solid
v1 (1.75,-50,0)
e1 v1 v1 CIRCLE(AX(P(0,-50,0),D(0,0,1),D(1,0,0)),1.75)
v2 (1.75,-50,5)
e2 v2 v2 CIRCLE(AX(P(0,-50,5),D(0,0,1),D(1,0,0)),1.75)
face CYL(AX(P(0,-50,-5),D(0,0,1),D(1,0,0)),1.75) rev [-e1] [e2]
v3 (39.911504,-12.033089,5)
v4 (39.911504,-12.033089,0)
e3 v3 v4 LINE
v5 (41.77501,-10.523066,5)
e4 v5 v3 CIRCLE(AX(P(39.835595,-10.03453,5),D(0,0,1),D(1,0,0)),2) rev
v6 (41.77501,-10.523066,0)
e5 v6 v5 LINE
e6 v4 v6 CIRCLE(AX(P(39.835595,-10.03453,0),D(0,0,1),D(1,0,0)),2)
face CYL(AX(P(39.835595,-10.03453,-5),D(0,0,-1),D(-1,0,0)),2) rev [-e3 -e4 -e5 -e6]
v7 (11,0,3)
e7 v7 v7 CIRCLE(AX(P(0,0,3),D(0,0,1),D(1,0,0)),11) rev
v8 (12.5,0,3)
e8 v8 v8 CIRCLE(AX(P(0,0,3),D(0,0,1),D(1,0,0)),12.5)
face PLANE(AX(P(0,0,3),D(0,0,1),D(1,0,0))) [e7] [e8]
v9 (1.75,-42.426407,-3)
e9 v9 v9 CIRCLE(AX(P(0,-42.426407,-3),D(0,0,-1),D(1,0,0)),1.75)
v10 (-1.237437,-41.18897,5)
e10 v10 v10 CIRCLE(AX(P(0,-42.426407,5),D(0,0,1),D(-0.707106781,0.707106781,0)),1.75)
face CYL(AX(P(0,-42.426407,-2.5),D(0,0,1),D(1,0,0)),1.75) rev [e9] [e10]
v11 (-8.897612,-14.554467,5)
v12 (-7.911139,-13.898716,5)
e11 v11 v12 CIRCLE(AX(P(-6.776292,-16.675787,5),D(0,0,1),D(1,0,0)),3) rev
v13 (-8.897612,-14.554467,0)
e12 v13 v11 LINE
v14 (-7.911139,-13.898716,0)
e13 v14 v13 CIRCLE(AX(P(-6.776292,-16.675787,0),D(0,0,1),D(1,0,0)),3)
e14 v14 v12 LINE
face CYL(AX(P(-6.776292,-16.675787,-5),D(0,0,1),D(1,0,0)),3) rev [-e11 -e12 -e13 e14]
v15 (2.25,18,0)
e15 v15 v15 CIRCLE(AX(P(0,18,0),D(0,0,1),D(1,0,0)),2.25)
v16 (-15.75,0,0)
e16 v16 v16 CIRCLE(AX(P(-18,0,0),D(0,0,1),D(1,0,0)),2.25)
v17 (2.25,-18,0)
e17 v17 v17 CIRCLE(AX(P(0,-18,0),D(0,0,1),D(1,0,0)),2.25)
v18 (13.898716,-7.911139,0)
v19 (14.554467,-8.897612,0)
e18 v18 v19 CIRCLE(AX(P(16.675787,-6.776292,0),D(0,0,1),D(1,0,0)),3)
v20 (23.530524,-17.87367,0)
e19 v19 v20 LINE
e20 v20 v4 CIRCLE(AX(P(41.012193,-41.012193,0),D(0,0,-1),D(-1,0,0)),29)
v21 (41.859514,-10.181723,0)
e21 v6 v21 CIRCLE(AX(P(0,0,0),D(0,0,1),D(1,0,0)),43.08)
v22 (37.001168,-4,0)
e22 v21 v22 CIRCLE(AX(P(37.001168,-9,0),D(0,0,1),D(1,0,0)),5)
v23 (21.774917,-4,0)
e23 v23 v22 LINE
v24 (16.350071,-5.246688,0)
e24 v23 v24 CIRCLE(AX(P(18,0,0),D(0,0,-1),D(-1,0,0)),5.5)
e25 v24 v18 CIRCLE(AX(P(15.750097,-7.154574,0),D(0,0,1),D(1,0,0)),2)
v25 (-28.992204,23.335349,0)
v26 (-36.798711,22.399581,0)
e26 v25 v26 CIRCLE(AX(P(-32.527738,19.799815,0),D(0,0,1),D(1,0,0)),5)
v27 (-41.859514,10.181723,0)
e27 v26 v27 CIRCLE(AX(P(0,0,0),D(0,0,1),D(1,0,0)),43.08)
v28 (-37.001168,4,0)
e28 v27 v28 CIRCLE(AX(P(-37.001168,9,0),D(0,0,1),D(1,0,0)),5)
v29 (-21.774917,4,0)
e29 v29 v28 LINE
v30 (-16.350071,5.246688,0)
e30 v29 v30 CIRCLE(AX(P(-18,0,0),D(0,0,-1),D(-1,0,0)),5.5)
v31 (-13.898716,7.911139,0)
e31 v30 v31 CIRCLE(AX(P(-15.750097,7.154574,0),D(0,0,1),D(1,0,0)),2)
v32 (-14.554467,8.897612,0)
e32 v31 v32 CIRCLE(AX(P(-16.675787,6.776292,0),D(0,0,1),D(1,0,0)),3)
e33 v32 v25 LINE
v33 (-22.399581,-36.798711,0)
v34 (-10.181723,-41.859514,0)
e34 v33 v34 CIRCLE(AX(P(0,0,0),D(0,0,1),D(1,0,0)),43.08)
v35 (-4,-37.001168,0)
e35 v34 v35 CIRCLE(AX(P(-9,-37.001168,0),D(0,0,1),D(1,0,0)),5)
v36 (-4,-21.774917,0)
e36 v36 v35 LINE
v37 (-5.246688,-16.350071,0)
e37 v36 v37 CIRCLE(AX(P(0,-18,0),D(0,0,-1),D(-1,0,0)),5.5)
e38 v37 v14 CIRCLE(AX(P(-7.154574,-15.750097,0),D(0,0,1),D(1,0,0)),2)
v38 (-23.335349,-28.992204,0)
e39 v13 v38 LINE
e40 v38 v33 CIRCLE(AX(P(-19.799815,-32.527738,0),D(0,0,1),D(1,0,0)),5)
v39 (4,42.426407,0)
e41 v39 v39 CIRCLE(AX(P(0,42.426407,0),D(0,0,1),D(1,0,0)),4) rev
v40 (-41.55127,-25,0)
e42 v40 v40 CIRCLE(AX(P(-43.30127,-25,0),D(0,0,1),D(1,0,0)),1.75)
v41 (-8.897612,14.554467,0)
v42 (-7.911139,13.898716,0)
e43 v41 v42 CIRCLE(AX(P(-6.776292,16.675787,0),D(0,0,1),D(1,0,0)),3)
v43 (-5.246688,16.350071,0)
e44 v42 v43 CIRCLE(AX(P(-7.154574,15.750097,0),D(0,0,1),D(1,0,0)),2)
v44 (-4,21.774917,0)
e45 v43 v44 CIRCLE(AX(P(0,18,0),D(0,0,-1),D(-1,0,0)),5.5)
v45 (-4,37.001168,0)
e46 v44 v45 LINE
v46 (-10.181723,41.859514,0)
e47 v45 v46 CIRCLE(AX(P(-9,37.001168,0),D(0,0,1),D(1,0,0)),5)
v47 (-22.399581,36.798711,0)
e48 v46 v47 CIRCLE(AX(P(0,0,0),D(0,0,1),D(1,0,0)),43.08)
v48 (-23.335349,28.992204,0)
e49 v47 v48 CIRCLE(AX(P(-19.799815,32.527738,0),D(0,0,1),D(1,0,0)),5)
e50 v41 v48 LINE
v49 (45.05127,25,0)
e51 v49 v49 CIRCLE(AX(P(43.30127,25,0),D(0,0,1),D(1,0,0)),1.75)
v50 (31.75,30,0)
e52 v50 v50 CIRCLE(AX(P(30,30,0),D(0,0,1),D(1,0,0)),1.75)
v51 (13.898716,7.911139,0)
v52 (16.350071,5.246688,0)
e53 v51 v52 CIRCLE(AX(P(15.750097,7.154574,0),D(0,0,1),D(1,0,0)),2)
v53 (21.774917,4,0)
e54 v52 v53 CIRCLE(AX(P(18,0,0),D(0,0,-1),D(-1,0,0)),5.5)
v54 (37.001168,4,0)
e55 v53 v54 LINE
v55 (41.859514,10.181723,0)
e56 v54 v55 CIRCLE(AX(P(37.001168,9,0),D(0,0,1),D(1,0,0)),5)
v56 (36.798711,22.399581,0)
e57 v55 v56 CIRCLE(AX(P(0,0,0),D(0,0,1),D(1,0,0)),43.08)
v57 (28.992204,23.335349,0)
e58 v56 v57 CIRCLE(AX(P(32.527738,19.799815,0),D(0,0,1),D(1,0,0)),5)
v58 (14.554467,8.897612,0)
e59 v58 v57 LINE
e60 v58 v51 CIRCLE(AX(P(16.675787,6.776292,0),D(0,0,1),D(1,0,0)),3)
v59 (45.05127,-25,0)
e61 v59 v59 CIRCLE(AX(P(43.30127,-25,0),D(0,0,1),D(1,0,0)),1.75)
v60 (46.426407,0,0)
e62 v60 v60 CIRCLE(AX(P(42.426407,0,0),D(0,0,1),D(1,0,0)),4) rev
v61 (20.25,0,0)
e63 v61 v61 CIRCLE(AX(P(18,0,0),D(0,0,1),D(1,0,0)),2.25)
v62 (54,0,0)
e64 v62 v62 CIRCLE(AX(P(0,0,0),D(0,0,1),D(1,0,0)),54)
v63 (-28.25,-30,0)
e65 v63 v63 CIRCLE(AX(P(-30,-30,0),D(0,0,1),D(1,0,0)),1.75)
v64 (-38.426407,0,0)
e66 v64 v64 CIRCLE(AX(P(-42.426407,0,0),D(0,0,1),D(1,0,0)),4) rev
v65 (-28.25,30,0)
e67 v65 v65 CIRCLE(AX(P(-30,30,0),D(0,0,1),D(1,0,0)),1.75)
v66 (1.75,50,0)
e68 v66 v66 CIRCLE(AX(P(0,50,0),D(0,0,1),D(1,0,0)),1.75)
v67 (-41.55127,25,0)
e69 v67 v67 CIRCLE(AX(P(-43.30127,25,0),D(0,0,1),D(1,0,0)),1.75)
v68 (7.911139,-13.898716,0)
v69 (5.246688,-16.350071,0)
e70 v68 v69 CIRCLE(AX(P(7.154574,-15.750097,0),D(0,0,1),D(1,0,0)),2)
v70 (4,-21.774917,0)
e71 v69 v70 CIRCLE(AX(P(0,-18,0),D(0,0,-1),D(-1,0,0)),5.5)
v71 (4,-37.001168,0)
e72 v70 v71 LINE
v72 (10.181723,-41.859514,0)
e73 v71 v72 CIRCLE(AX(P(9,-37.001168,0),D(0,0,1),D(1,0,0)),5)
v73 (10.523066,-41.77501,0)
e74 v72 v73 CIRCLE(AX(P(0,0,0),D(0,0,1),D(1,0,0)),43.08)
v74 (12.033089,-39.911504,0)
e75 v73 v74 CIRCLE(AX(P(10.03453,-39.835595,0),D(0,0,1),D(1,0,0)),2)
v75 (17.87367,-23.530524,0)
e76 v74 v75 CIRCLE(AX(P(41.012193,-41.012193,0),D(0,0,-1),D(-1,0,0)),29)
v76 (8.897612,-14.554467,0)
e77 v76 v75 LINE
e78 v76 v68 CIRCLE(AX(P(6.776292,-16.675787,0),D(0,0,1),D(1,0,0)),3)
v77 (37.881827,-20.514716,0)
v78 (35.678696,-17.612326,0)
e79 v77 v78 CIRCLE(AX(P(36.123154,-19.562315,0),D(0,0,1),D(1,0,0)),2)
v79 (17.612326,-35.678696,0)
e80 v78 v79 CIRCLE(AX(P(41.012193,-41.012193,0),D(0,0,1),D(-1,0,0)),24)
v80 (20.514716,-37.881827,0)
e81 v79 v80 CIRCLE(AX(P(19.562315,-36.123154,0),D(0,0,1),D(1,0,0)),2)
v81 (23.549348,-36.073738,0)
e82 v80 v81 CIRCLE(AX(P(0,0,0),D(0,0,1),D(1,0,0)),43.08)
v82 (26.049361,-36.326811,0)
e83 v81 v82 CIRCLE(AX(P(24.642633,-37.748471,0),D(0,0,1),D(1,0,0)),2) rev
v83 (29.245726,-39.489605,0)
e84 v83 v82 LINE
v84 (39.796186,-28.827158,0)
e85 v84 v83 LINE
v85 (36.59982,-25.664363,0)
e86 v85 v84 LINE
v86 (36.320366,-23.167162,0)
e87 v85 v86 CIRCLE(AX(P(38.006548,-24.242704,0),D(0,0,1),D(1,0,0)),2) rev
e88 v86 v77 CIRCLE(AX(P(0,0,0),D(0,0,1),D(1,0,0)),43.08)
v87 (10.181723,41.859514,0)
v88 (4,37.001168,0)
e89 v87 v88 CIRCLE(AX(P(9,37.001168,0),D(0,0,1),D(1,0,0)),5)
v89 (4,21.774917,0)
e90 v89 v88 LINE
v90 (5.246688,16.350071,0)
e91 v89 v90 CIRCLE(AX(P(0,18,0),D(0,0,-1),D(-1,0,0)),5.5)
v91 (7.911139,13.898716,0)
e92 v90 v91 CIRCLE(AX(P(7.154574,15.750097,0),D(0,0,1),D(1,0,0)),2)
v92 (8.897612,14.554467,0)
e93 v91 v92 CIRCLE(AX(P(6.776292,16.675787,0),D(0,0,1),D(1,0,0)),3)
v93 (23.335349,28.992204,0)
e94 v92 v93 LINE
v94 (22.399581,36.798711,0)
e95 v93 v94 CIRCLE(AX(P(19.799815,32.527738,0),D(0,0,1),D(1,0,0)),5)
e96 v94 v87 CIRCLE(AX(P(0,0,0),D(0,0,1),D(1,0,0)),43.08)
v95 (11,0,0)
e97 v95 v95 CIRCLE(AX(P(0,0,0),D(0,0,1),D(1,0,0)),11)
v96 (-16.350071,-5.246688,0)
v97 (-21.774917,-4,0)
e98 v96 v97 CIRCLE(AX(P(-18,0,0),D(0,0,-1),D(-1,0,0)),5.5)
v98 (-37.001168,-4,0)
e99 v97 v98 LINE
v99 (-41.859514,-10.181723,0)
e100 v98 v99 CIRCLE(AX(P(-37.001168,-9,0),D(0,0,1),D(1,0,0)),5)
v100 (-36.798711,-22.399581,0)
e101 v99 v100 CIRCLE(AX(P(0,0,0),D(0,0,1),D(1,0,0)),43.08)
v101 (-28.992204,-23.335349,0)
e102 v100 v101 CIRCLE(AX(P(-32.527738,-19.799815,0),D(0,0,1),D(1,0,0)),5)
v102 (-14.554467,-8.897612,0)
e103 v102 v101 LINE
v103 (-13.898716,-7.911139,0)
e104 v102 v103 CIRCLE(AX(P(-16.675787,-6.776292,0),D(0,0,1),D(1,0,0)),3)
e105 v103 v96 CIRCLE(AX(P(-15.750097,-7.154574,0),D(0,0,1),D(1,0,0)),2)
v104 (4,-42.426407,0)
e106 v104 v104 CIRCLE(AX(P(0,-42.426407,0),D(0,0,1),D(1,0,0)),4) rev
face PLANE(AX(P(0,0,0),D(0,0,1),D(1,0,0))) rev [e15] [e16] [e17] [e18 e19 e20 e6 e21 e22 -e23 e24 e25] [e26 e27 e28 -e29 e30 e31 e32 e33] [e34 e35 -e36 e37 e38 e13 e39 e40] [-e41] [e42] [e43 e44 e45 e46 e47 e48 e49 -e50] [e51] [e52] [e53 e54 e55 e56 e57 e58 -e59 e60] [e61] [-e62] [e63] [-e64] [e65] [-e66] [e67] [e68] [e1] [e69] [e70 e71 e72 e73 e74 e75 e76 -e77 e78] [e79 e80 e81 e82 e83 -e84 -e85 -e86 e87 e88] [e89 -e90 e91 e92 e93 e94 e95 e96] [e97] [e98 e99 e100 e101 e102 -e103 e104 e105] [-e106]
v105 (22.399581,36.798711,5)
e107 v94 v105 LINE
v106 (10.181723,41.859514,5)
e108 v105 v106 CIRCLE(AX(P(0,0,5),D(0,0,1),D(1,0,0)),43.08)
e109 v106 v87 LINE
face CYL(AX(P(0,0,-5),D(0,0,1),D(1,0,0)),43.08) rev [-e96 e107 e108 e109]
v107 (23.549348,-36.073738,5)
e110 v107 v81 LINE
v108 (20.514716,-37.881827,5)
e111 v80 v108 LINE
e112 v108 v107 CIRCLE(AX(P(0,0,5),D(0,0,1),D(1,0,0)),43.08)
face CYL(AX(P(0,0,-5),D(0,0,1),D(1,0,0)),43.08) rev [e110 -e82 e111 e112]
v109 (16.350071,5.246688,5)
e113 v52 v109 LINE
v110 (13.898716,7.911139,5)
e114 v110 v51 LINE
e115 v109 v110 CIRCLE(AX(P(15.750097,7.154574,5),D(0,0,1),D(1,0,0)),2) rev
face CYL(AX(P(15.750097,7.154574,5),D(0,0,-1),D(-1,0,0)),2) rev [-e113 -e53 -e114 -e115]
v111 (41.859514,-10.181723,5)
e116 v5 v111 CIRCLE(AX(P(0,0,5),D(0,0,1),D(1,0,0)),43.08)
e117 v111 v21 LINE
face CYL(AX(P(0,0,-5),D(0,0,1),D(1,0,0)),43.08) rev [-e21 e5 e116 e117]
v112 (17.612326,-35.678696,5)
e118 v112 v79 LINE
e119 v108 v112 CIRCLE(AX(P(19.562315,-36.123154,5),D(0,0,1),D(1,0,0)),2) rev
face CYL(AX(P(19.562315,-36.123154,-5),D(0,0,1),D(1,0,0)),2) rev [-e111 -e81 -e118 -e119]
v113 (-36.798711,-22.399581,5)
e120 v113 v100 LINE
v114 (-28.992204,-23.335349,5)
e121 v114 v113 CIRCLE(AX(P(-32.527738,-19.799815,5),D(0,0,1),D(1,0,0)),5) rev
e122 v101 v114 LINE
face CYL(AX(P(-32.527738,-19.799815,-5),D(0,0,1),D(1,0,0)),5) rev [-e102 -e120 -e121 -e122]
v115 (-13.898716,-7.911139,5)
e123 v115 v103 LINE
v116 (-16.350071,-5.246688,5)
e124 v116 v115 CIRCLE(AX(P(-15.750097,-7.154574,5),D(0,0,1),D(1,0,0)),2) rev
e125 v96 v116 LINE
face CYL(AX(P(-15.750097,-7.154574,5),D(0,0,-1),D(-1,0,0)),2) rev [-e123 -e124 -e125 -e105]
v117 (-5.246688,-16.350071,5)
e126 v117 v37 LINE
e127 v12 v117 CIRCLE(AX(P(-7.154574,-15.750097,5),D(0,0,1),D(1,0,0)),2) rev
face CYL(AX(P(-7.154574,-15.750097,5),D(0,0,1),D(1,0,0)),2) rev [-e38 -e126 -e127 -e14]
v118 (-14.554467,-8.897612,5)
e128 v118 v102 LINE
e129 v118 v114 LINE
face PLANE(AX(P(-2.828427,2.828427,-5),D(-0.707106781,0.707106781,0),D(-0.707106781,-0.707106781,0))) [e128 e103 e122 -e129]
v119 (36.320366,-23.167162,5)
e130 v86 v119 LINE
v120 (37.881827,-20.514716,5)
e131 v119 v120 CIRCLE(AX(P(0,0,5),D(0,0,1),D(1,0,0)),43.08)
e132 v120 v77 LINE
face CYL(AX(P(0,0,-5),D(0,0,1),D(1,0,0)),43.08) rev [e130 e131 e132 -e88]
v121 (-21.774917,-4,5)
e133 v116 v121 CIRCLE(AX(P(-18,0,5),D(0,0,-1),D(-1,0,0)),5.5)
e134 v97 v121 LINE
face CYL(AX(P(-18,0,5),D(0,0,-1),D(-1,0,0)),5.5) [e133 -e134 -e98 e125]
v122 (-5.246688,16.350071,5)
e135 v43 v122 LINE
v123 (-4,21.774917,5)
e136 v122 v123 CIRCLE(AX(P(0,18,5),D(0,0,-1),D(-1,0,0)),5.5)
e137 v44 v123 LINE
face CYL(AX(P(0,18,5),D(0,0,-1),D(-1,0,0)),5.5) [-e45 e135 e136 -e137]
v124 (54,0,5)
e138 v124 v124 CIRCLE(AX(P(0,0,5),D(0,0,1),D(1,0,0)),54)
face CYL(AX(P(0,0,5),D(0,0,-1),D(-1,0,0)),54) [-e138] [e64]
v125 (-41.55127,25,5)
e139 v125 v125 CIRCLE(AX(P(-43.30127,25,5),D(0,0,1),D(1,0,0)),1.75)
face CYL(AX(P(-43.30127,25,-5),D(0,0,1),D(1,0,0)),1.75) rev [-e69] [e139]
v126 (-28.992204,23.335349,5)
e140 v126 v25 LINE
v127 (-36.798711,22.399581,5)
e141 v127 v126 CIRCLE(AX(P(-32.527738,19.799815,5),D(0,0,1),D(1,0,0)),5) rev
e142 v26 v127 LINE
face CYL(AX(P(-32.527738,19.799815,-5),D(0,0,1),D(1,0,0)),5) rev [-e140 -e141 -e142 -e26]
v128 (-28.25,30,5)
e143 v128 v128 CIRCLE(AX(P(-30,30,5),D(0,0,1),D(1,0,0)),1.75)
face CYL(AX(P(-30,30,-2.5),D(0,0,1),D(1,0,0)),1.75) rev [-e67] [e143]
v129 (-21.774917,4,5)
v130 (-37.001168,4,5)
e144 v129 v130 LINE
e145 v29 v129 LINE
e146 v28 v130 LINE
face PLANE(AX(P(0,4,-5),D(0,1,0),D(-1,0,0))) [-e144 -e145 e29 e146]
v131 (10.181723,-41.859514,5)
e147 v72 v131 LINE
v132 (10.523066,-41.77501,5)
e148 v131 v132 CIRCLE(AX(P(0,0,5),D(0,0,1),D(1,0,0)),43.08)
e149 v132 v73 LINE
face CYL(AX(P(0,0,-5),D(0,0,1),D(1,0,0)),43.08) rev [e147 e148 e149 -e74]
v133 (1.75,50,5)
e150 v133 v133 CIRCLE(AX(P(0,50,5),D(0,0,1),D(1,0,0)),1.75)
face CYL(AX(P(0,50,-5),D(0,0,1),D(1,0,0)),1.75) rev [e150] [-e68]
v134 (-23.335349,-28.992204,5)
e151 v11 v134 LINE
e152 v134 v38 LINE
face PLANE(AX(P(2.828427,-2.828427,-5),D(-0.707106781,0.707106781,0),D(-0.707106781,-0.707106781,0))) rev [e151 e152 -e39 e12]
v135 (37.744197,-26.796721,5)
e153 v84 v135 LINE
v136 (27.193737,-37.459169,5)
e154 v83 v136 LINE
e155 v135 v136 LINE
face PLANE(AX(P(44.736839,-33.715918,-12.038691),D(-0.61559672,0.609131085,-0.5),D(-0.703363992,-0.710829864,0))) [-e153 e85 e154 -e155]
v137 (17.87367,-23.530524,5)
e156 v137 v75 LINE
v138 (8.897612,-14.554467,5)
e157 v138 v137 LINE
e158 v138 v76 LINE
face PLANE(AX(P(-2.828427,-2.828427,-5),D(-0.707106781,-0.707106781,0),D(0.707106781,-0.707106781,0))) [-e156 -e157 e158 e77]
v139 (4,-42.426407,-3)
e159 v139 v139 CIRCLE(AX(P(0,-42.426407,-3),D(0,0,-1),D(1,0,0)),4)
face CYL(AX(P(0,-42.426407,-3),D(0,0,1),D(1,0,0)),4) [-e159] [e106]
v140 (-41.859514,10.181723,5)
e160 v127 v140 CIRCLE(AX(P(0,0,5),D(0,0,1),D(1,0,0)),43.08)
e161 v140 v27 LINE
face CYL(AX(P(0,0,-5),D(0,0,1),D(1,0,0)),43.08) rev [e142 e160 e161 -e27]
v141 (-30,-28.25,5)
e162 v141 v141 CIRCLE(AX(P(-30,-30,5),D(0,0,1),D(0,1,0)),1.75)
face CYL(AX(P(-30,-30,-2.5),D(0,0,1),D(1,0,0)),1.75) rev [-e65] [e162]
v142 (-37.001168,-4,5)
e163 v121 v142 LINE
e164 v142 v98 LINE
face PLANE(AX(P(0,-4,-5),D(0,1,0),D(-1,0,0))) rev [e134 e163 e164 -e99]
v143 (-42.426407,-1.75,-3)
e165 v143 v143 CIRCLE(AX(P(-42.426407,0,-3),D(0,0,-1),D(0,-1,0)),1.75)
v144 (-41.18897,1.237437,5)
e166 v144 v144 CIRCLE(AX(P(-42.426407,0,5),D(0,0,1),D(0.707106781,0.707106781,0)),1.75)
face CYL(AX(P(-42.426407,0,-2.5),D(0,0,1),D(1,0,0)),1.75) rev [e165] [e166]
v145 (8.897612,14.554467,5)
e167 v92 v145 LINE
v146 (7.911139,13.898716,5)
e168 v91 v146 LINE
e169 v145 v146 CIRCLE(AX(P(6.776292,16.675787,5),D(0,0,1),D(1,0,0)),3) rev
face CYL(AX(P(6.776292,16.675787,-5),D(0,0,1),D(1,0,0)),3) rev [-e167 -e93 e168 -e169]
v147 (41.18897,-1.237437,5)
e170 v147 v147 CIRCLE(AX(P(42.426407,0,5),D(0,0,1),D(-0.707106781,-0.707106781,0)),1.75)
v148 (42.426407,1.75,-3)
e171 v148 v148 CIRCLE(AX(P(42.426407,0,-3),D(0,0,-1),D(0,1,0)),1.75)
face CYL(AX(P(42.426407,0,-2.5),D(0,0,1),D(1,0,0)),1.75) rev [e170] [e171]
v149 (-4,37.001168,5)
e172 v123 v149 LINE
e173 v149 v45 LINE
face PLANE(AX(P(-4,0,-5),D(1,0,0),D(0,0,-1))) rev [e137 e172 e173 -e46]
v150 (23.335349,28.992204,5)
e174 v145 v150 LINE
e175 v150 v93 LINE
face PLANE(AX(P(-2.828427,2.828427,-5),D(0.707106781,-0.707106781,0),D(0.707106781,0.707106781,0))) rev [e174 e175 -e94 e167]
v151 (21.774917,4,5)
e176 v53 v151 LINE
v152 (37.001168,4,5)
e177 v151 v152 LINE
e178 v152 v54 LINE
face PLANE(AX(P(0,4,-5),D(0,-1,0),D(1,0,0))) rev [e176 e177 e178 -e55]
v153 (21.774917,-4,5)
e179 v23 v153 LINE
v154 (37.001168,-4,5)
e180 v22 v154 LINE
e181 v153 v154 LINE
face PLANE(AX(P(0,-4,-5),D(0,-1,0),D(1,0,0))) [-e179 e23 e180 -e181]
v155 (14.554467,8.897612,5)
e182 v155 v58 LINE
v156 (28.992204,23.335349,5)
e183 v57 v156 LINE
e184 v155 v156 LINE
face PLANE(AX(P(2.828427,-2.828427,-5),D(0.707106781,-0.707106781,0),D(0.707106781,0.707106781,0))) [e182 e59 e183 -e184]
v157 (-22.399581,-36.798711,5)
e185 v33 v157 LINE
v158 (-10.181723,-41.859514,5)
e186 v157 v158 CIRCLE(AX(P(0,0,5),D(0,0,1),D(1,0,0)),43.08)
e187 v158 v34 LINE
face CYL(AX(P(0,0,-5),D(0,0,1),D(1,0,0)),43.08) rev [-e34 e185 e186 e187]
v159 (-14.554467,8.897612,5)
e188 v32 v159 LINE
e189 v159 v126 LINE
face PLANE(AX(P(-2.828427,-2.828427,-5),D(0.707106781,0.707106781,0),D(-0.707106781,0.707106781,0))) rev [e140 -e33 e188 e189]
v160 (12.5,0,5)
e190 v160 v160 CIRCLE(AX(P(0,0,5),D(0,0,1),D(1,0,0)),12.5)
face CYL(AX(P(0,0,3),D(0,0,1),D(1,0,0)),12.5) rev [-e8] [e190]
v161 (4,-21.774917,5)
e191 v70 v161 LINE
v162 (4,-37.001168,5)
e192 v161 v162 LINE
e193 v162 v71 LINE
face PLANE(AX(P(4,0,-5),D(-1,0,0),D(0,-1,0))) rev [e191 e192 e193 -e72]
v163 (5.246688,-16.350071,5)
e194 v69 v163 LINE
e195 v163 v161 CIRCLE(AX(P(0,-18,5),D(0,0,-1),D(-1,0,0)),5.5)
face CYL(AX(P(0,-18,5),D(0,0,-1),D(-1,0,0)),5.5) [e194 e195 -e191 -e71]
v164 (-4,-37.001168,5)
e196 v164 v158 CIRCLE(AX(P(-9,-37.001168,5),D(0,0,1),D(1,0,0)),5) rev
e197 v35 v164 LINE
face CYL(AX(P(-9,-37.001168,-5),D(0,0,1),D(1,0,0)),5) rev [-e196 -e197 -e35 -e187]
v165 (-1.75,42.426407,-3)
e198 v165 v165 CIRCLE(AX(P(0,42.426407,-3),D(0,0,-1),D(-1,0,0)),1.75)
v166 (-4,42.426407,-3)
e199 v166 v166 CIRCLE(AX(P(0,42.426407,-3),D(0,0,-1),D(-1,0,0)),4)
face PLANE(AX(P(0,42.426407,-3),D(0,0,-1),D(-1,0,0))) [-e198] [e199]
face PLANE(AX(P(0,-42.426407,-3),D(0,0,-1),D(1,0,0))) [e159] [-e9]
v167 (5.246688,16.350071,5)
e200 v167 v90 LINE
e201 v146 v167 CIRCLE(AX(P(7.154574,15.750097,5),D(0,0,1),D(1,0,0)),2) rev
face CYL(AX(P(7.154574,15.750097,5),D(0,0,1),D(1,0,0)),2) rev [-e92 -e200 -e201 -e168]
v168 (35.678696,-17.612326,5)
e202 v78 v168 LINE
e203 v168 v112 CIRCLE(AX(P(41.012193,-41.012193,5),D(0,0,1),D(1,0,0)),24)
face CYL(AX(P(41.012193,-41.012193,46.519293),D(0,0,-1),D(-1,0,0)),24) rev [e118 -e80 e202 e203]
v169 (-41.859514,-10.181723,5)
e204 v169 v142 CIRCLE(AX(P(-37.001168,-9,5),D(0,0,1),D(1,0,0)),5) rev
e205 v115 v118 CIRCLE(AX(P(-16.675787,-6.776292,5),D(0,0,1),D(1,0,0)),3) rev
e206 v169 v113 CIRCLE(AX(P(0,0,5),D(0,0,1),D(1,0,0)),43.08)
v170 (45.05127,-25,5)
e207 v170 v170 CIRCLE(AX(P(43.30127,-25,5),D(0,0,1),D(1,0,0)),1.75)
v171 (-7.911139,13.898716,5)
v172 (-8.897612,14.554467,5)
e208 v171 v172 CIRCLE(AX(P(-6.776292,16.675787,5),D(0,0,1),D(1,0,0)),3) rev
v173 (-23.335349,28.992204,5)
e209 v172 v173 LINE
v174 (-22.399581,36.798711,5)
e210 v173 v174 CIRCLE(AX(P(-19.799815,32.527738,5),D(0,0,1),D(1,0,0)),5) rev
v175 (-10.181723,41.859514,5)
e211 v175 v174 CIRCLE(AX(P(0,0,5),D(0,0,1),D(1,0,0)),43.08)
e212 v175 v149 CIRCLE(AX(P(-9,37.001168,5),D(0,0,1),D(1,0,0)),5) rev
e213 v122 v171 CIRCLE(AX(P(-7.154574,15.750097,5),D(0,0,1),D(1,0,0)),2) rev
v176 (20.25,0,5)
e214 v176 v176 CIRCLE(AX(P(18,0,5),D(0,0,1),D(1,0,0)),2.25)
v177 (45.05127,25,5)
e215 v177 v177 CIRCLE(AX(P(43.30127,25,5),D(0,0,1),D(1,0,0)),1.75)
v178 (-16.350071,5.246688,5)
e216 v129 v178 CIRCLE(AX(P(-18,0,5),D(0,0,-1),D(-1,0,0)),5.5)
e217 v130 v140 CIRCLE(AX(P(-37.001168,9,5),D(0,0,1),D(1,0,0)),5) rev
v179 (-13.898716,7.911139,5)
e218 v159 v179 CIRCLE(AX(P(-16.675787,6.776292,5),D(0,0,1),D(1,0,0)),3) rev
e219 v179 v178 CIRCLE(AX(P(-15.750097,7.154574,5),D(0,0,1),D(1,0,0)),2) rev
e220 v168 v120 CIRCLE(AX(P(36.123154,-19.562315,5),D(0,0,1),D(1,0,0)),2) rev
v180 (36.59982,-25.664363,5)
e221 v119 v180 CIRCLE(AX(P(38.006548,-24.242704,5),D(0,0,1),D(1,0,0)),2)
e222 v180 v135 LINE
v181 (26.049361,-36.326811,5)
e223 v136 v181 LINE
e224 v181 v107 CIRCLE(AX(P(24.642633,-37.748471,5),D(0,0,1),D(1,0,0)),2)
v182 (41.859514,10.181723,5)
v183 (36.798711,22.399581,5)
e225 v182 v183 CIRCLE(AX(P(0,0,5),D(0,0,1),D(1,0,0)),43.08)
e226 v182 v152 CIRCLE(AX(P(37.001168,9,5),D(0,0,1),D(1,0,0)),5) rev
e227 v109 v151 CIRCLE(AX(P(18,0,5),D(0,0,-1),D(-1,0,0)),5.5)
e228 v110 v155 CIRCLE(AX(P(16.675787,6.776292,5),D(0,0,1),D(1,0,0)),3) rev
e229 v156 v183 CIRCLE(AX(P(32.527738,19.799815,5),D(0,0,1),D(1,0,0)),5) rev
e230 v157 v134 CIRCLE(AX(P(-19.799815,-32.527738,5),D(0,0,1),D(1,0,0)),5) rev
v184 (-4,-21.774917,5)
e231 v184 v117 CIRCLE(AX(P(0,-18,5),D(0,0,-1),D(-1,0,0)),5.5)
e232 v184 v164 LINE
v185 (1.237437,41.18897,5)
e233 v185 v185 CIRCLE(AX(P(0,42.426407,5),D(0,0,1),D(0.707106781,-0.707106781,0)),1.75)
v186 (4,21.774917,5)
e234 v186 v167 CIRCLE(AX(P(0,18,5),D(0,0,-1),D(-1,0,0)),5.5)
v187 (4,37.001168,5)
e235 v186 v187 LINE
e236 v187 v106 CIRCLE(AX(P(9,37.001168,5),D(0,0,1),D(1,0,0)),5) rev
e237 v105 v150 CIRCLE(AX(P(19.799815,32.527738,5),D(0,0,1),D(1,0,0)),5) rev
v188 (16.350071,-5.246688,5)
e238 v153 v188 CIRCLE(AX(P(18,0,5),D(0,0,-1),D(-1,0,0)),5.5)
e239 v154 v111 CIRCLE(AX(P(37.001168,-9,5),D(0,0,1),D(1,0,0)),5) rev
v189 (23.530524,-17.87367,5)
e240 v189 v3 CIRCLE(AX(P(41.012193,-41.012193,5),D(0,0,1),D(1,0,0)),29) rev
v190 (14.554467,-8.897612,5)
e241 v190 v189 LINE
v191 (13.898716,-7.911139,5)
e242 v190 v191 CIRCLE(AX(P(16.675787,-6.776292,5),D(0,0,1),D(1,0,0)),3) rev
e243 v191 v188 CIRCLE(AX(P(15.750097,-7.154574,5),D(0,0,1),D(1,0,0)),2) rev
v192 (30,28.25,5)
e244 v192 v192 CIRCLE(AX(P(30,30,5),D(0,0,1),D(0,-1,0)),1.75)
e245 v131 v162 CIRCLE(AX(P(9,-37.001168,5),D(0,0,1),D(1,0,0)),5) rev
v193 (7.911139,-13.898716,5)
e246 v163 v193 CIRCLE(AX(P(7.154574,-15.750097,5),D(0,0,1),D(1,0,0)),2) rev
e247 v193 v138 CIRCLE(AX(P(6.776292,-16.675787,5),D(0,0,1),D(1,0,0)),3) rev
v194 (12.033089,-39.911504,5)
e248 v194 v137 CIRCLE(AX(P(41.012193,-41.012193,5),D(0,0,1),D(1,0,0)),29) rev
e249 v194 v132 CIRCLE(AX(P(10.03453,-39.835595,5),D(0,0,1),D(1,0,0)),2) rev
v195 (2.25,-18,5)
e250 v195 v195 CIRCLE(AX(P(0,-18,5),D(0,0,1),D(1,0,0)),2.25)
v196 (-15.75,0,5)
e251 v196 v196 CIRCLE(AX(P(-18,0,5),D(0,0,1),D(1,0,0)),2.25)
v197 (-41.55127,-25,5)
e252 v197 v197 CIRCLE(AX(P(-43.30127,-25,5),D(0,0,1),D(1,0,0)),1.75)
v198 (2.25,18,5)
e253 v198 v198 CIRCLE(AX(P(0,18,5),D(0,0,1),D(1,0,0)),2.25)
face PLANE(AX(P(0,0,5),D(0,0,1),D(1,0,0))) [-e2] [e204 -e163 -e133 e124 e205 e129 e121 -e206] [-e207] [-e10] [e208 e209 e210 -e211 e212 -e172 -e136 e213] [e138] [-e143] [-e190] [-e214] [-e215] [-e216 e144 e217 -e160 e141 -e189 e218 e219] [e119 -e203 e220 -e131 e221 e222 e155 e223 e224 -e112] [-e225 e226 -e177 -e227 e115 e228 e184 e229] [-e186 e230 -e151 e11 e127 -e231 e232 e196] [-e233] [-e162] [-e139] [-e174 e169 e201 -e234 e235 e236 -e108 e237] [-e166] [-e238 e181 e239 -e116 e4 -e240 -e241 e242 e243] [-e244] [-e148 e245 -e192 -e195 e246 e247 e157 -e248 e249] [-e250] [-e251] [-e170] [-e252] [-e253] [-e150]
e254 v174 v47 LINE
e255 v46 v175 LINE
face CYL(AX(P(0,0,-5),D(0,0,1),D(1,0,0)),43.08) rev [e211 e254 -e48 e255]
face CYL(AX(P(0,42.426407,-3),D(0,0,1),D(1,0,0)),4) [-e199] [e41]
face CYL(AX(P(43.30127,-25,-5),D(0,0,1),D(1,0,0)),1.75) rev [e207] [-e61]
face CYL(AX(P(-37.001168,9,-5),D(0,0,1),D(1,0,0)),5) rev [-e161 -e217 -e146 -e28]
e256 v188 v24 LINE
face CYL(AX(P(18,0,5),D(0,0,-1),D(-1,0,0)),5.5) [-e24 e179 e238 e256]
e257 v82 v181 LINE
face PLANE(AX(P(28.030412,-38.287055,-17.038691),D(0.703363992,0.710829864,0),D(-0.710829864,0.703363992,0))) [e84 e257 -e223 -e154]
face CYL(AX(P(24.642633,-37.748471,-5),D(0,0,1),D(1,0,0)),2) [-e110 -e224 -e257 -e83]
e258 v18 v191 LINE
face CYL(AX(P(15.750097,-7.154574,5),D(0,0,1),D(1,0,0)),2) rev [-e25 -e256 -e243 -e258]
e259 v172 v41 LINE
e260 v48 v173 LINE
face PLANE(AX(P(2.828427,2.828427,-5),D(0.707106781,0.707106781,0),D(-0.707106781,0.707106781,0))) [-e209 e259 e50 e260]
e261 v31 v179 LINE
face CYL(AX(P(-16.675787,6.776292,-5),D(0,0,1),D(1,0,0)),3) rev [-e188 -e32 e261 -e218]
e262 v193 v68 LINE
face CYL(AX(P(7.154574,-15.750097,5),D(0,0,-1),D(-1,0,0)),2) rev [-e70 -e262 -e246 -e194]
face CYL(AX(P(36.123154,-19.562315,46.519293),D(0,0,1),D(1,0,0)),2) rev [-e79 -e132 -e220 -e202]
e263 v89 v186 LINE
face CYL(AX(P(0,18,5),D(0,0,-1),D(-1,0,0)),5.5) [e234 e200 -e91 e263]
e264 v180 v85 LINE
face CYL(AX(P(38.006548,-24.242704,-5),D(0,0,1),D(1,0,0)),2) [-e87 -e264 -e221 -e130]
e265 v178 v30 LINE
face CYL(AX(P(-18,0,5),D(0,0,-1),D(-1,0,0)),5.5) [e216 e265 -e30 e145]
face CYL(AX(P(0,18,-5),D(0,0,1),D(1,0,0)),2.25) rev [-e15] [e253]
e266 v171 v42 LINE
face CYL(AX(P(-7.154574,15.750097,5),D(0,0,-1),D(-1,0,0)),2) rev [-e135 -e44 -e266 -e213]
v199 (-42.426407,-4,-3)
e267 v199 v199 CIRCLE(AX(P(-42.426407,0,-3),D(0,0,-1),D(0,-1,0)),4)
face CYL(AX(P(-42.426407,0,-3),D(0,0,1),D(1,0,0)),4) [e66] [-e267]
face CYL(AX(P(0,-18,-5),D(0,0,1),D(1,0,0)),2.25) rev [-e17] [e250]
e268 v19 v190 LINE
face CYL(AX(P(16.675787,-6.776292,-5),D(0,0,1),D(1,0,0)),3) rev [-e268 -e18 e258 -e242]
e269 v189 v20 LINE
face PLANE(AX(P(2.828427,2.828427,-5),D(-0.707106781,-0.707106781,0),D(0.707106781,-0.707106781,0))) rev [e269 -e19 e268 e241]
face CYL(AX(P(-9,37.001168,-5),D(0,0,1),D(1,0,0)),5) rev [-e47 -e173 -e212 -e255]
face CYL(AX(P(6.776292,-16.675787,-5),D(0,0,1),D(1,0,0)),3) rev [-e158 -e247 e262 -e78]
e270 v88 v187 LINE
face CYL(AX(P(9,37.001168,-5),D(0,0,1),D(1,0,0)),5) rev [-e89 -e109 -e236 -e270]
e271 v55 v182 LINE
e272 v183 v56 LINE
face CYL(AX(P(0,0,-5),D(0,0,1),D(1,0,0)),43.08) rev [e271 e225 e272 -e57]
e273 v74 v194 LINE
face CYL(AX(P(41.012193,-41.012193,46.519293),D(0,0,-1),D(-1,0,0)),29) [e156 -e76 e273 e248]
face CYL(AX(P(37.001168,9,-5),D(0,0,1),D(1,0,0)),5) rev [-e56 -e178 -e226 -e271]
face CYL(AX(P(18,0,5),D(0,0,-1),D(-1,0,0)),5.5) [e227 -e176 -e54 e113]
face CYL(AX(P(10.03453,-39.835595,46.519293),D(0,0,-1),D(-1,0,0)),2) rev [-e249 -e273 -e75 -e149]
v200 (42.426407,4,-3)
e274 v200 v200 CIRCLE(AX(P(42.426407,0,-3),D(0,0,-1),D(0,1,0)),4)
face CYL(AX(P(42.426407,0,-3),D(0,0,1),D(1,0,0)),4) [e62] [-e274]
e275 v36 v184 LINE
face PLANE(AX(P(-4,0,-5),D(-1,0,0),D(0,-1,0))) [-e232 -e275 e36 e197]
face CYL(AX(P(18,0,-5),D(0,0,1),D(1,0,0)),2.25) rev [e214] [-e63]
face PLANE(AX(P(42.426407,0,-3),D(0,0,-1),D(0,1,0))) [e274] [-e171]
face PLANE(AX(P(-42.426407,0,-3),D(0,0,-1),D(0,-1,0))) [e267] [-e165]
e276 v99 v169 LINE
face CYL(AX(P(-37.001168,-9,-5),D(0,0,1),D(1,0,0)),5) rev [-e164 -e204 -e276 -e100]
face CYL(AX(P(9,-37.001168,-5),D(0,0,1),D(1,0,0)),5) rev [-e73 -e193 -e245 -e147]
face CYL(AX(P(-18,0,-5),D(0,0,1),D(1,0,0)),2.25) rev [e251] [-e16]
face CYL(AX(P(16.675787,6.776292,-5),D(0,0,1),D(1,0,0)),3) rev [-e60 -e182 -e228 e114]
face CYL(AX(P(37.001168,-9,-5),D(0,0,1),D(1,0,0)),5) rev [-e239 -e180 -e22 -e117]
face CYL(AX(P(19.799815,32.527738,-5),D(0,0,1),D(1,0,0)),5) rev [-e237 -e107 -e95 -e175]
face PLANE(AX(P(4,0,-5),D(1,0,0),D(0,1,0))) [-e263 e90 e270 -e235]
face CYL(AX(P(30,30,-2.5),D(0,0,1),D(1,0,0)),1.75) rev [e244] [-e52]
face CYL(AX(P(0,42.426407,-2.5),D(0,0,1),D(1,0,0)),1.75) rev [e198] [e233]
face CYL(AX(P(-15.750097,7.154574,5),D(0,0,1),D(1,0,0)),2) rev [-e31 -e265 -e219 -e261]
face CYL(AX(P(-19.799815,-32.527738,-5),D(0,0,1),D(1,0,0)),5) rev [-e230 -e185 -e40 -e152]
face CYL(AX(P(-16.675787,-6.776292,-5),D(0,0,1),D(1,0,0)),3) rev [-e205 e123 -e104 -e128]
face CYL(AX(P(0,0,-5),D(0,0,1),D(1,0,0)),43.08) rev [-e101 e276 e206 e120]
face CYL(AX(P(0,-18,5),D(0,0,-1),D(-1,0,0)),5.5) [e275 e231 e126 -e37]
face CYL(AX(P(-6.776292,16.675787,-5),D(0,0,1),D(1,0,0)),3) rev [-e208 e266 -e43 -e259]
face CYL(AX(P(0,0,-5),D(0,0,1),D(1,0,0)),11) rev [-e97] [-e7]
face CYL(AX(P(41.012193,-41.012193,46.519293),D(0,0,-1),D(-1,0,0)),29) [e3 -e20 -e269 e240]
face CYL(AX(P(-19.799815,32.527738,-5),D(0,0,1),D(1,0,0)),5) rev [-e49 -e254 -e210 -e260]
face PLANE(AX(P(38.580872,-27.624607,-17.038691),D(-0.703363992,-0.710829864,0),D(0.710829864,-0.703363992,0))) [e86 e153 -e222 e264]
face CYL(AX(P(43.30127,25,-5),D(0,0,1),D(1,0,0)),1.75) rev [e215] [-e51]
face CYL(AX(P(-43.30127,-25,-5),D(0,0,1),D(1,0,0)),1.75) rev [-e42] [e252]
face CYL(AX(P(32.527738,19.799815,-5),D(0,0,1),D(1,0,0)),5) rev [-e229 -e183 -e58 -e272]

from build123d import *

# Parameters (mm, degrees)
SKETCH1_R                = 54
BOSS_EXTRUDE1_DEPTH      = 5
CUT_EXTRUDE4_DEPTH       = 10
SKETCH3_R                = 2.25
CUT_EXTRUDE5_DEPTH       = 10
SKETCH4_R                = 1.75
CUT_EXTRUDE6_DEPTH       = 10
FILLET1_R                = 5
FILLET3_R                = 3
SKETCH5_R                = 11
CUT_EXTRUDE7_DEPTH       = 10
SKETCH6_R                = 45.5
SKETCH6_R_2              = 43.5
BOSS_EXTRUDE2_DEPTH      = 5
CUT_EXTRUDE8_DEPTH       = 7.5
CIRPATTERN1_COUNT        = 8
CUT_EXTRUDE9_START       = -10
CUT_EXTRUDE9_DEPTH       = 10
CUT_EXTRUDE11_DEPTH      = 91.188379779
CUT_EXTRUDE11_DEPTH_BACK = 91.188379779
SKETCH13_W               = 15
SKETCH13_H               = 10
BOSS_EXTRUDE3_START      = -5
BOSS_EXTRUDE3_DEPTH      = 5
FILLET4_R                = 2
FILLET5_R                = 2
FILLET6_R                = 2
BOSS_EXTRUDE4_START      = -5
SKETCH16_R               = 5.5
SKETCH16_R_2             = 2.25
BOSS_EXTRUDE4_DEPTH      = 5
FILLET7_R                = 2
SKETCH17_R               = 12.5
CUT_EXTRUDE12_DEPTH      = 2
SKETCH18_R               = 1.75
SKETCH18_R_2             = 4
BOSS_EXTRUDE5_DEPTH      = 3
CIRPATTERN2_START        = -3
CIRPATTERN2_OUTLINE_R    = 4
CIRPATTERN2_OUTLINE_R_2  = 1.75
CIRPATTERN2_DEPTH        = 8.0000001


with BuildPart() as part:
    # Sketch1 → Boss-Extrude1 (new body)
    with BuildSketch(Plane.XY):
        Circle(SKETCH1_R)
    extrude(amount=BOSS_EXTRUDE1_DEPTH)

    # Sketch2 → Cut-Extrude4 (cut)
    with BuildSketch(Plane.XY.offset(5)):
        with BuildLine():
            ThreePointArc((-7.394097025, 13.050951275), (-5.740251485, 13.858192988), (-4, 14.456832295))
            Line((-4, 14.456832295), (-4, 42.893897002))
            ThreePointArc((-4, 42.893897002), (-16.486002266, 39.800730261), (-27.502138317, 33.158992566))
            Line((-27.502138317, 33.158992566), (-7.394097025, 13.050951275))
        make_face()
        with BuildLine():
            Line((4, 42.893897002), (4, 14.456832295))
            ThreePointArc((4, 14.456832295), (5.740251485, 13.858192988), (7.394097025, 13.050951275))
            Line((7.394097025, 13.050951275), (27.502138317, 33.158992566))
            ThreePointArc((27.502138317, 33.158992566), (16.486002266, 39.800730261), (4, 42.893897002))
        make_face()
        with BuildLine():
            Line((33.158992566, 27.502138317), (13.050951275, 7.394097025))
            ThreePointArc((13.050951275, 7.394097025), (13.858192988, 5.740251485), (14.456832295, 4))
            Line((14.456832295, 4), (42.893897002, 4))
            ThreePointArc((42.893897002, 4), (39.800730261, 16.486002266), (33.158992566, 27.502138317))
        make_face()
        with BuildLine():
            Line((42.893897002, -4), (14.456832295, -4))
            ThreePointArc((14.456832295, -4), (13.858192988, -5.740251485), (13.050951275, -7.394097025))
            Line((13.050951275, -7.394097025), (33.158992566, -27.502138317))
            ThreePointArc((33.158992566, -27.502138317), (39.800730261, -16.486002266), (42.893897002, -4))
        make_face()
        with BuildLine():
            Line((27.502138317, -33.158992566), (7.394097025, -13.050951275))
            ThreePointArc((7.394097025, -13.050951275), (5.740251485, -13.858192988), (4, -14.456832295))
            Line((4, -14.456832295), (4, -42.893897002))
            ThreePointArc((4, -42.893897002), (16.486002266, -39.800730261), (27.502138317, -33.158992566))
        make_face()
        with BuildLine():
            ThreePointArc((-4, -14.456832295), (-5.740251485, -13.858192988), (-7.394097025, -13.050951275))
            Line((-7.394097025, -13.050951275), (-27.502138317, -33.158992566))
            ThreePointArc((-27.502138317, -33.158992566), (-16.486002266, -39.800730261), (-4, -42.893897002))
            Line((-4, -42.893897002), (-4, -14.456832295))
        make_face()
        with BuildLine():
            ThreePointArc((-13.050951275, -7.394097025), (-13.858192988, -5.740251485), (-14.456832295, -4))
            Line((-14.456832295, -4), (-42.893897002, -4))
            ThreePointArc((-42.893897002, -4), (-39.800730261, -16.486002266), (-33.158992566, -27.502138317))
            Line((-33.158992566, -27.502138317), (-13.050951275, -7.394097025))
        make_face()
        with BuildLine():
            ThreePointArc((-14.456832295, 4), (-13.858192988, 5.740251485), (-13.050951275, 7.394097025))
            Line((-13.050951275, 7.394097025), (-33.158992566, 27.502138317))
            ThreePointArc((-33.158992566, 27.502138317), (-39.800730261, 16.486002266), (-42.893897002, 4))
            Line((-42.893897002, 4), (-14.456832295, 4))
        make_face()
    extrude(amount=-CUT_EXTRUDE4_DEPTH, mode=Mode.SUBTRACT)

    # Sketch3 → Cut-Extrude5 (cut)
    with BuildSketch(Plane.XY.offset(5)):
        with Locations((0, 18)):
            Circle(SKETCH3_R)
        with Locations((18, 0)):
            Circle(SKETCH3_R)
        with Locations((0, -18)):
            Circle(SKETCH3_R)
        with Locations((-18, 0)):
            Circle(SKETCH3_R)
    extrude(amount=-CUT_EXTRUDE5_DEPTH, mode=Mode.SUBTRACT)

    # Sketch4 → Cut-Extrude6 (cut)
    with BuildSketch(Plane.XY.offset(5)):
        with Locations((0, 50)):
            Circle(SKETCH4_R)
        with Locations((43.301270189, 25)):
            Circle(SKETCH4_R)
        with Locations((43.301270189, -25)):
            Circle(SKETCH4_R)
        with Locations((0, -50)):
            Circle(SKETCH4_R)
        with Locations((-43.301270189, -25)):
            Circle(SKETCH4_R)
        with Locations((-43.301270189, 25)):
            Circle(SKETCH4_R)
    extrude(amount=-CUT_EXTRUDE6_DEPTH, mode=Mode.SUBTRACT)

    # Fillet1
    fillet1_edges = [part.edges().sort_by_distance(p)[0] for p in [
        (-33.158992566, 27.502138317, 2.5),
        (-42.893897002, 4, 2.5),
        (-27.502138317, -33.158992566, 2.5),
        (-4, -42.893897002, 2.5),
        (-42.893897002, -4, 2.5),
        (-33.158992566, -27.502138317, 2.5),
        (33.158992566, -27.502138317, 2.5),
        (42.893897002, -4, 2.5),
        (4, -42.893897002, 2.5),
        (27.502138317, -33.158992566, 2.5),
        (27.502138317, 33.158992566, 2.5),
        (4, 42.893897002, 2.5),
        (42.893897002, 4, 2.5),
        (33.158992566, 27.502138317, 2.5),
        (-4, 42.893897002, 2.5),
        (-27.502138317, 33.158992566, 2.5),
    ]]
    fillet(fillet1_edges, radius=FILLET1_R)

    # Fillet3
    # the kernel refuses this fillet: 3 mm, written as the material it adds along each edge
    with BuildSketch(Plane(origin=(-14.456832295, -4, 5), x_dir=(-1, 0, 0), z_dir=(0, 0, -1)), Plane(origin=(-7.394097025, -13.050951275, 5), x_dir=(-0.7071067811865792, -0.7071067811865157, 0), z_dir=(0, 0, -1)), Plane(origin=(4, -14.456832295, 5), x_dir=(0, -1, 0), z_dir=(0, 0, -1)), Plane(origin=(13.050951275, -7.394097025, 5), x_dir=(0.7071067811865726, -0.7071067811865225, 0), z_dir=(0, 0, -1)), Plane(origin=(14.456832295, 4, 5), x_dir=(1, 0, 0), z_dir=(0, 0, -1)), Plane(origin=(7.394097025, 13.050951275, 5), x_dir=(0.7071067811865331, 0.707106781186562, 0), z_dir=(0, 0, -1)), Plane(origin=(-4, 14.456832295, 5), x_dir=(0, 1, 0), z_dir=(0, 0, -1)), Plane(origin=(-13.050951275, 7.394097025, 5), x_dir=(-0.7071067811865053, 0.7071067811865897, 0), z_dir=(0, 0, -1))) as fillet3_piece_1:
        with BuildLine():
            CenterArc((2.126291657, -3), FILLET3_R, 90, 67.114619524)
            ThreePointArc((-0.637562335, -1.833333333), (-0.289095445, -0.926990211), (0, 0))
            Line((0, 0), (2.126291657, 0))
        make_face()
    extrude(amount=5)
    with BuildSketch(Plane(origin=(-13.050951275, -7.394097025, 5), x_dir=(-0.4356129740982292, 0.900134066013111, 0), z_dir=(0, 0, -1)), Plane(origin=(-4, -14.456832295, 5), x_dir=(-0.9445157900125684, 0.32846601409724885, 0), z_dir=(0, 0, -1)), Plane(origin=(14.456832295, -4, 5), x_dir=(-0.3284660140975722, -0.9445157900124558, 0), z_dir=(0, 0, -1)), Plane(origin=(13.050951275, 7.394097025, 5), x_dir=(0.4356129740977994, -0.9001340660133189, 0), z_dir=(0, 0, -1)), Plane(origin=(4, 14.456832295, 5), x_dir=(0.9445157900124527, -0.32846601409758125, 0), z_dir=(0, 0, -1)), Plane(origin=(-7.394097025, 13.050951275, 5), x_dir=(0.9001340660132181, 0.43561297409800753, 0), z_dir=(0, 0, -1)), Plane(origin=(-14.456832295, 4, 5), x_dir=(0.32846601409726156, 0.9445157900125638, 0), z_dir=(0, 0, -1))) as fillet3_piece_2:
        with BuildLine():
            CenterArc((2.135132825, -2.993714086), FILLET3_R, 93.709685261, 67.114619524)
            Line((-0.698414545, -2.008316044), (0, 0))
            ThreePointArc((0, 0), (0.97051492, -0.031429568), (1.941029841, 0))
        make_face()
    extrude(amount=5)
    with BuildSketch(Plane(origin=(7.394097025, -13.050951275, 5), x_dir=(0.7071067811865624, -0.7071067811865328, 0), z_dir=(0, 0, -1))) as fillet3_piece_3:
        with BuildLine():
            CenterArc((2.126291657, 3), FILLET3_R, 202.885380476, 67.114619524)
            ThreePointArc((-0.637562335, 1.833333333), (-0.289095445, 0.926990211), (0, 0))
            Line((0, 0), (2.126291657, 0))
        make_face()
    extrude(amount=5)

    # Sketch5 → Cut-Extrude7 (cut)
    with BuildSketch(Plane.XY.offset(5)):
        Circle(SKETCH5_R)
    extrude(amount=-CUT_EXTRUDE7_DEPTH, mode=Mode.SUBTRACT)

    # Sketch6 → Boss-Extrude2 (add)
    with BuildSketch(Plane.XY.offset(5)):
        Circle(SKETCH6_R)
        Circle(SKETCH6_R_2, mode=Mode.SUBTRACT)
    extrude(amount=-BOSS_EXTRUDE2_DEPTH)

    # Sketch7 → Cut-Extrude8 (cut)
    with BuildSketch(Plane.XY.offset(5)):
        with BuildLine():
            Line((-30, 28.25), (-30, 30))
            Line((-30, 30), (-28.25, 30))
            ThreePointArc((-28.25, 30), (-31.237436867, 31.237436867), (-30, 28.25))
        make_face()
        with BuildLine():
            Line((-28.25, 30), (-30, 30))
            Line((-30, 30), (-30, 28.25))
            ThreePointArc((-30, 28.25), (-28.762563133, 28.762563133), (-28.25, 30))
        make_face()
    cut_extrude8 = extrude(amount=-CUT_EXTRUDE8_DEPTH, mode=Mode.SUBTRACT)

    # CirPattern1: Cut-Extrude8 ×8 about axis
    cirpattern1_axis = Axis((0, 0, 0), (0, 0, 1))
    for i in range(1, CIRPATTERN1_COUNT):
        add(cut_extrude8.rotate(cirpattern1_axis, i * 360 / CIRPATTERN1_COUNT), mode=Mode.SUBTRACT)

    # Sketch9 → Cut-Extrude9 (cut)
    with BuildSketch(Plane(origin=(0, 0, 0), x_dir=(-1, 0, 0), z_dir=(0, 0, -1)).offset(CUT_EXTRUDE9_START)):
        with BuildLine():
            Line((-26.047884483, -20.391030233), (-36.798711455, -22.39958114))
            ThreePointArc((-36.798711455, -22.39958114), (-30.462160134, -30.462160134), (-22.39958114, -36.798711455))
            Line((-22.39958114, -36.798711455), (-20.391030233, -26.047884483))
            ThreePointArc((-20.391030233, -26.047884483), (-23.391092322, -23.391092322), (-26.047884483, -20.391030233))
        make_face()
    extrude(amount=CUT_EXTRUDE9_DEPTH, mode=Mode.SUBTRACT)

    # Sketch13 → Cut-Extrude11 (cut, two sides: drawn at the far end of the back side and taken through both)
    with BuildSketch(Plane(origin=(7.604244558, -7.524376901, -18.528959742), x_dir=(-0.7033639917323762, -0.7108298637045983, 0), z_dir=(0.3554149318522999, -0.3516819958661888, -0.866025403784438)).offset(-CUT_EXTRUDE11_DEPTH_BACK)):
        with Locations((0, -37.057919485)):
            Rectangle(SKETCH13_W, SKETCH13_H)
    extrude(amount=CUT_EXTRUDE11_DEPTH + CUT_EXTRUDE11_DEPTH_BACK, mode=Mode.SUBTRACT)

    # Sketch15 → Boss-Extrude3 (add)
    with BuildSketch(Plane(origin=(0, 0, 0), x_dir=(-1, 0, 0), z_dir=(0, 0, -1)).offset(BOSS_EXTRUDE3_START)):
        with BuildLine():
            ThreePointArc((-17.056184089, -39.559739437), (-24.04163056, -24.04163056), (-39.559739437, -17.056184089))
            ThreePointArc((-39.559739437, -17.056184089), (-40.543699656, -14.563475484), (-41.370766822, -12.014410203))
            ThreePointArc((-41.370766822, -12.014410203), (-20.506096654, -20.506096654), (-12.014410203, -41.370766822))
            ThreePointArc((-12.014410203, -41.370766822), (-14.563475484, -40.543699656), (-17.056184089, -39.559739437))
        make_face()
    extrude(amount=BOSS_EXTRUDE3_DEPTH)

    # Fillet4
    fillet4_edges = [part.edges().sort_by_distance(p)[0] for p in [
        (17.056184089, -39.559739437, 2.5),
        (39.559739437, -17.056184089, 2.5),
    ]]
    fillet(fillet4_edges, radius=FILLET4_R)

    # Fillet5
    fillet5_edges = [part.edges().sort_by_distance(p)[0] for p in [
        (41.370766822, -12.014410203, 2.5),
        (12.014410203, -41.370766822, 2.5),
    ]]
    fillet(fillet5_edges, radius=FILLET5_R)

    # Fillet6
    fillet6_edges = [part.edges().sort_by_distance(p)[0] for p in [
        (35.430140844, -24.5069688, 2.5),
        (24.879680968, -35.169416755, 2.5),
    ]]
    fillet(fillet6_edges, radius=FILLET6_R)

    # Sketch16 → Boss-Extrude4 (add)
    # profile 1 of 4: a face of its own
    with BuildSketch(Plane(origin=(0, 0, 0), x_dir=(-1, 0, 0), z_dir=(0, 0, -1)).offset(BOSS_EXTRUDE4_START)):
        with Locations((-18, 0)):
            Circle(SKETCH16_R)
        with Locations(Location((-18, 0, 0), (0, 0, 180))):
            Circle(SKETCH16_R_2, mode=Mode.SUBTRACT)
    # profile 2 of 4: a face of its own
    with BuildSketch(Plane(origin=(0, 0, 0), x_dir=(-1, 0, 0), z_dir=(0, 0, -1)).offset(BOSS_EXTRUDE4_START)):
        with Locations((0, 18)):
            Circle(SKETCH16_R)
        with Locations(Location((0, 18, 0), (0, 0, 180))):
            Circle(SKETCH16_R_2, mode=Mode.SUBTRACT)
    # profile 3 of 4: a face of its own
    with BuildSketch(Plane(origin=(0, 0, 0), x_dir=(-1, 0, 0), z_dir=(0, 0, -1)).offset(BOSS_EXTRUDE4_START)):
        with Locations((18, 0)):
            Circle(SKETCH16_R)
        with Locations(Location((18, 0, 0), (0, 0, 180))):
            Circle(SKETCH16_R_2, mode=Mode.SUBTRACT)
    # profile 4 of 4: a face of its own
    with BuildSketch(Plane(origin=(0, 0, 0), x_dir=(-1, 0, 0), z_dir=(0, 0, -1)).offset(BOSS_EXTRUDE4_START)):
        with Locations((0, -18)):
            Circle(SKETCH16_R)
        with Locations(Location((0, -18, 0), (0, 0, 180))):
            Circle(SKETCH16_R_2, mode=Mode.SUBTRACT)
    extrude(amount=BOSS_EXTRUDE4_DEPTH)

    # Fillet7
    fillet7_edges = [part.edges().sort_by_distance(p)[0] for p in [
        (-14.880649429, 4.529862251, 2.5),
        (-14.880649429, -4.529862251, 2.5),
        (-4.529862251, -14.880649429, 2.5),
        (4.529862251, -14.880649429, 2.5),
        (14.880649429, -4.529862251, 2.5),
        (14.880649429, 4.529862251, 2.5),
        (4.529862251, 14.880649429, 2.5),
        (-4.529862251, 14.880649429, 2.5),
    ]]
    fillet(fillet7_edges, radius=FILLET7_R)

    # Sketch17 → Cut-Extrude12 (cut)
    with BuildSketch(Plane.XY.offset(5)):
        Circle(SKETCH17_R)
    extrude(amount=-CUT_EXTRUDE12_DEPTH, mode=Mode.SUBTRACT)

    # Sketch18 → Boss-Extrude5 (add)
    # profile 1 of 4: a face of its own
    with BuildSketch(Plane(origin=(0, 0, 0), x_dir=(-1, 0, 0), z_dir=(0, 0, -1))):
        with Locations(Location((0, -42.426406871, 0), (0, 0, 180))):
            Circle(SKETCH18_R)
    # profile 2 of 4: a face of its own
    with BuildSketch(Plane(origin=(0, 0, 0), x_dir=(-1, 0, 0), z_dir=(0, 0, -1))):
        with Locations(Location((42.426406871, 0, 0), (0, 0, 180))):
            Circle(SKETCH18_R)
    # profile 3 of 4: a face of its own
    with BuildSketch(Plane(origin=(0, 0, 0), x_dir=(-1, 0, 0), z_dir=(0, 0, -1))):
        with Locations(Location((-42.426406871, 0, 0), (0, 0, 180))):
            Circle(SKETCH18_R)
    # profile 4 of 4: a face of its own
    with BuildSketch(Plane(origin=(0, 0, 0), x_dir=(-1, 0, 0), z_dir=(0, 0, -1))):
        with Locations(Location((0, 42.426406871, 0), (0, 0, 180))):
            Circle(SKETCH18_R_2)
        with Locations(Location((0, 42.426406871, 0), (0, 0, 225))):
            Circle(SKETCH18_R, mode=Mode.SUBTRACT)
    extrude(amount=BOSS_EXTRUDE5_DEPTH)


with BuildPart() as boss_extrude5_kept_piece:
    # of the separate pieces the step leaves, the one the design keeps (boss_extrude5_pieces_kept)
    add(part.part.solids().sort_by_distance((54, 0, 5))[0])

    # CirPattern2: read off the stored shape, not the designer's step
    # CirPattern2 outline → CirPattern2 (add)
    # profile 1 of 3: a face of its own
    with BuildSketch(Plane.XY.offset(CIRPATTERN2_START)):
        with Locations((-42.426406871, 0)):
            Circle(CIRPATTERN2_OUTLINE_R)
        with Locations((-42.426406871, 0)):
            Circle(CIRPATTERN2_OUTLINE_R_2, mode=Mode.SUBTRACT)
    # profile 2 of 3: a face of its own
    with BuildSketch(Plane.XY.offset(CIRPATTERN2_START)):
        with Locations((0, -42.426406871)):
            Circle(CIRPATTERN2_OUTLINE_R)
        with Locations((0, -42.426406871)):
            Circle(CIRPATTERN2_OUTLINE_R_2, mode=Mode.SUBTRACT)
    # profile 3 of 3: a face of its own
    with BuildSketch(Plane.XY.offset(CIRPATTERN2_START)):
        with Locations((42.426406871, 0)):
            Circle(CIRPATTERN2_OUTLINE_R)
        with Locations((42.426406871, 0)):
            Circle(CIRPATTERN2_OUTLINE_R_2, mode=Mode.SUBTRACT)
    extrude(amount=CIRPATTERN2_DEPTH)


solid = boss_extrude5_kept_piece.part
